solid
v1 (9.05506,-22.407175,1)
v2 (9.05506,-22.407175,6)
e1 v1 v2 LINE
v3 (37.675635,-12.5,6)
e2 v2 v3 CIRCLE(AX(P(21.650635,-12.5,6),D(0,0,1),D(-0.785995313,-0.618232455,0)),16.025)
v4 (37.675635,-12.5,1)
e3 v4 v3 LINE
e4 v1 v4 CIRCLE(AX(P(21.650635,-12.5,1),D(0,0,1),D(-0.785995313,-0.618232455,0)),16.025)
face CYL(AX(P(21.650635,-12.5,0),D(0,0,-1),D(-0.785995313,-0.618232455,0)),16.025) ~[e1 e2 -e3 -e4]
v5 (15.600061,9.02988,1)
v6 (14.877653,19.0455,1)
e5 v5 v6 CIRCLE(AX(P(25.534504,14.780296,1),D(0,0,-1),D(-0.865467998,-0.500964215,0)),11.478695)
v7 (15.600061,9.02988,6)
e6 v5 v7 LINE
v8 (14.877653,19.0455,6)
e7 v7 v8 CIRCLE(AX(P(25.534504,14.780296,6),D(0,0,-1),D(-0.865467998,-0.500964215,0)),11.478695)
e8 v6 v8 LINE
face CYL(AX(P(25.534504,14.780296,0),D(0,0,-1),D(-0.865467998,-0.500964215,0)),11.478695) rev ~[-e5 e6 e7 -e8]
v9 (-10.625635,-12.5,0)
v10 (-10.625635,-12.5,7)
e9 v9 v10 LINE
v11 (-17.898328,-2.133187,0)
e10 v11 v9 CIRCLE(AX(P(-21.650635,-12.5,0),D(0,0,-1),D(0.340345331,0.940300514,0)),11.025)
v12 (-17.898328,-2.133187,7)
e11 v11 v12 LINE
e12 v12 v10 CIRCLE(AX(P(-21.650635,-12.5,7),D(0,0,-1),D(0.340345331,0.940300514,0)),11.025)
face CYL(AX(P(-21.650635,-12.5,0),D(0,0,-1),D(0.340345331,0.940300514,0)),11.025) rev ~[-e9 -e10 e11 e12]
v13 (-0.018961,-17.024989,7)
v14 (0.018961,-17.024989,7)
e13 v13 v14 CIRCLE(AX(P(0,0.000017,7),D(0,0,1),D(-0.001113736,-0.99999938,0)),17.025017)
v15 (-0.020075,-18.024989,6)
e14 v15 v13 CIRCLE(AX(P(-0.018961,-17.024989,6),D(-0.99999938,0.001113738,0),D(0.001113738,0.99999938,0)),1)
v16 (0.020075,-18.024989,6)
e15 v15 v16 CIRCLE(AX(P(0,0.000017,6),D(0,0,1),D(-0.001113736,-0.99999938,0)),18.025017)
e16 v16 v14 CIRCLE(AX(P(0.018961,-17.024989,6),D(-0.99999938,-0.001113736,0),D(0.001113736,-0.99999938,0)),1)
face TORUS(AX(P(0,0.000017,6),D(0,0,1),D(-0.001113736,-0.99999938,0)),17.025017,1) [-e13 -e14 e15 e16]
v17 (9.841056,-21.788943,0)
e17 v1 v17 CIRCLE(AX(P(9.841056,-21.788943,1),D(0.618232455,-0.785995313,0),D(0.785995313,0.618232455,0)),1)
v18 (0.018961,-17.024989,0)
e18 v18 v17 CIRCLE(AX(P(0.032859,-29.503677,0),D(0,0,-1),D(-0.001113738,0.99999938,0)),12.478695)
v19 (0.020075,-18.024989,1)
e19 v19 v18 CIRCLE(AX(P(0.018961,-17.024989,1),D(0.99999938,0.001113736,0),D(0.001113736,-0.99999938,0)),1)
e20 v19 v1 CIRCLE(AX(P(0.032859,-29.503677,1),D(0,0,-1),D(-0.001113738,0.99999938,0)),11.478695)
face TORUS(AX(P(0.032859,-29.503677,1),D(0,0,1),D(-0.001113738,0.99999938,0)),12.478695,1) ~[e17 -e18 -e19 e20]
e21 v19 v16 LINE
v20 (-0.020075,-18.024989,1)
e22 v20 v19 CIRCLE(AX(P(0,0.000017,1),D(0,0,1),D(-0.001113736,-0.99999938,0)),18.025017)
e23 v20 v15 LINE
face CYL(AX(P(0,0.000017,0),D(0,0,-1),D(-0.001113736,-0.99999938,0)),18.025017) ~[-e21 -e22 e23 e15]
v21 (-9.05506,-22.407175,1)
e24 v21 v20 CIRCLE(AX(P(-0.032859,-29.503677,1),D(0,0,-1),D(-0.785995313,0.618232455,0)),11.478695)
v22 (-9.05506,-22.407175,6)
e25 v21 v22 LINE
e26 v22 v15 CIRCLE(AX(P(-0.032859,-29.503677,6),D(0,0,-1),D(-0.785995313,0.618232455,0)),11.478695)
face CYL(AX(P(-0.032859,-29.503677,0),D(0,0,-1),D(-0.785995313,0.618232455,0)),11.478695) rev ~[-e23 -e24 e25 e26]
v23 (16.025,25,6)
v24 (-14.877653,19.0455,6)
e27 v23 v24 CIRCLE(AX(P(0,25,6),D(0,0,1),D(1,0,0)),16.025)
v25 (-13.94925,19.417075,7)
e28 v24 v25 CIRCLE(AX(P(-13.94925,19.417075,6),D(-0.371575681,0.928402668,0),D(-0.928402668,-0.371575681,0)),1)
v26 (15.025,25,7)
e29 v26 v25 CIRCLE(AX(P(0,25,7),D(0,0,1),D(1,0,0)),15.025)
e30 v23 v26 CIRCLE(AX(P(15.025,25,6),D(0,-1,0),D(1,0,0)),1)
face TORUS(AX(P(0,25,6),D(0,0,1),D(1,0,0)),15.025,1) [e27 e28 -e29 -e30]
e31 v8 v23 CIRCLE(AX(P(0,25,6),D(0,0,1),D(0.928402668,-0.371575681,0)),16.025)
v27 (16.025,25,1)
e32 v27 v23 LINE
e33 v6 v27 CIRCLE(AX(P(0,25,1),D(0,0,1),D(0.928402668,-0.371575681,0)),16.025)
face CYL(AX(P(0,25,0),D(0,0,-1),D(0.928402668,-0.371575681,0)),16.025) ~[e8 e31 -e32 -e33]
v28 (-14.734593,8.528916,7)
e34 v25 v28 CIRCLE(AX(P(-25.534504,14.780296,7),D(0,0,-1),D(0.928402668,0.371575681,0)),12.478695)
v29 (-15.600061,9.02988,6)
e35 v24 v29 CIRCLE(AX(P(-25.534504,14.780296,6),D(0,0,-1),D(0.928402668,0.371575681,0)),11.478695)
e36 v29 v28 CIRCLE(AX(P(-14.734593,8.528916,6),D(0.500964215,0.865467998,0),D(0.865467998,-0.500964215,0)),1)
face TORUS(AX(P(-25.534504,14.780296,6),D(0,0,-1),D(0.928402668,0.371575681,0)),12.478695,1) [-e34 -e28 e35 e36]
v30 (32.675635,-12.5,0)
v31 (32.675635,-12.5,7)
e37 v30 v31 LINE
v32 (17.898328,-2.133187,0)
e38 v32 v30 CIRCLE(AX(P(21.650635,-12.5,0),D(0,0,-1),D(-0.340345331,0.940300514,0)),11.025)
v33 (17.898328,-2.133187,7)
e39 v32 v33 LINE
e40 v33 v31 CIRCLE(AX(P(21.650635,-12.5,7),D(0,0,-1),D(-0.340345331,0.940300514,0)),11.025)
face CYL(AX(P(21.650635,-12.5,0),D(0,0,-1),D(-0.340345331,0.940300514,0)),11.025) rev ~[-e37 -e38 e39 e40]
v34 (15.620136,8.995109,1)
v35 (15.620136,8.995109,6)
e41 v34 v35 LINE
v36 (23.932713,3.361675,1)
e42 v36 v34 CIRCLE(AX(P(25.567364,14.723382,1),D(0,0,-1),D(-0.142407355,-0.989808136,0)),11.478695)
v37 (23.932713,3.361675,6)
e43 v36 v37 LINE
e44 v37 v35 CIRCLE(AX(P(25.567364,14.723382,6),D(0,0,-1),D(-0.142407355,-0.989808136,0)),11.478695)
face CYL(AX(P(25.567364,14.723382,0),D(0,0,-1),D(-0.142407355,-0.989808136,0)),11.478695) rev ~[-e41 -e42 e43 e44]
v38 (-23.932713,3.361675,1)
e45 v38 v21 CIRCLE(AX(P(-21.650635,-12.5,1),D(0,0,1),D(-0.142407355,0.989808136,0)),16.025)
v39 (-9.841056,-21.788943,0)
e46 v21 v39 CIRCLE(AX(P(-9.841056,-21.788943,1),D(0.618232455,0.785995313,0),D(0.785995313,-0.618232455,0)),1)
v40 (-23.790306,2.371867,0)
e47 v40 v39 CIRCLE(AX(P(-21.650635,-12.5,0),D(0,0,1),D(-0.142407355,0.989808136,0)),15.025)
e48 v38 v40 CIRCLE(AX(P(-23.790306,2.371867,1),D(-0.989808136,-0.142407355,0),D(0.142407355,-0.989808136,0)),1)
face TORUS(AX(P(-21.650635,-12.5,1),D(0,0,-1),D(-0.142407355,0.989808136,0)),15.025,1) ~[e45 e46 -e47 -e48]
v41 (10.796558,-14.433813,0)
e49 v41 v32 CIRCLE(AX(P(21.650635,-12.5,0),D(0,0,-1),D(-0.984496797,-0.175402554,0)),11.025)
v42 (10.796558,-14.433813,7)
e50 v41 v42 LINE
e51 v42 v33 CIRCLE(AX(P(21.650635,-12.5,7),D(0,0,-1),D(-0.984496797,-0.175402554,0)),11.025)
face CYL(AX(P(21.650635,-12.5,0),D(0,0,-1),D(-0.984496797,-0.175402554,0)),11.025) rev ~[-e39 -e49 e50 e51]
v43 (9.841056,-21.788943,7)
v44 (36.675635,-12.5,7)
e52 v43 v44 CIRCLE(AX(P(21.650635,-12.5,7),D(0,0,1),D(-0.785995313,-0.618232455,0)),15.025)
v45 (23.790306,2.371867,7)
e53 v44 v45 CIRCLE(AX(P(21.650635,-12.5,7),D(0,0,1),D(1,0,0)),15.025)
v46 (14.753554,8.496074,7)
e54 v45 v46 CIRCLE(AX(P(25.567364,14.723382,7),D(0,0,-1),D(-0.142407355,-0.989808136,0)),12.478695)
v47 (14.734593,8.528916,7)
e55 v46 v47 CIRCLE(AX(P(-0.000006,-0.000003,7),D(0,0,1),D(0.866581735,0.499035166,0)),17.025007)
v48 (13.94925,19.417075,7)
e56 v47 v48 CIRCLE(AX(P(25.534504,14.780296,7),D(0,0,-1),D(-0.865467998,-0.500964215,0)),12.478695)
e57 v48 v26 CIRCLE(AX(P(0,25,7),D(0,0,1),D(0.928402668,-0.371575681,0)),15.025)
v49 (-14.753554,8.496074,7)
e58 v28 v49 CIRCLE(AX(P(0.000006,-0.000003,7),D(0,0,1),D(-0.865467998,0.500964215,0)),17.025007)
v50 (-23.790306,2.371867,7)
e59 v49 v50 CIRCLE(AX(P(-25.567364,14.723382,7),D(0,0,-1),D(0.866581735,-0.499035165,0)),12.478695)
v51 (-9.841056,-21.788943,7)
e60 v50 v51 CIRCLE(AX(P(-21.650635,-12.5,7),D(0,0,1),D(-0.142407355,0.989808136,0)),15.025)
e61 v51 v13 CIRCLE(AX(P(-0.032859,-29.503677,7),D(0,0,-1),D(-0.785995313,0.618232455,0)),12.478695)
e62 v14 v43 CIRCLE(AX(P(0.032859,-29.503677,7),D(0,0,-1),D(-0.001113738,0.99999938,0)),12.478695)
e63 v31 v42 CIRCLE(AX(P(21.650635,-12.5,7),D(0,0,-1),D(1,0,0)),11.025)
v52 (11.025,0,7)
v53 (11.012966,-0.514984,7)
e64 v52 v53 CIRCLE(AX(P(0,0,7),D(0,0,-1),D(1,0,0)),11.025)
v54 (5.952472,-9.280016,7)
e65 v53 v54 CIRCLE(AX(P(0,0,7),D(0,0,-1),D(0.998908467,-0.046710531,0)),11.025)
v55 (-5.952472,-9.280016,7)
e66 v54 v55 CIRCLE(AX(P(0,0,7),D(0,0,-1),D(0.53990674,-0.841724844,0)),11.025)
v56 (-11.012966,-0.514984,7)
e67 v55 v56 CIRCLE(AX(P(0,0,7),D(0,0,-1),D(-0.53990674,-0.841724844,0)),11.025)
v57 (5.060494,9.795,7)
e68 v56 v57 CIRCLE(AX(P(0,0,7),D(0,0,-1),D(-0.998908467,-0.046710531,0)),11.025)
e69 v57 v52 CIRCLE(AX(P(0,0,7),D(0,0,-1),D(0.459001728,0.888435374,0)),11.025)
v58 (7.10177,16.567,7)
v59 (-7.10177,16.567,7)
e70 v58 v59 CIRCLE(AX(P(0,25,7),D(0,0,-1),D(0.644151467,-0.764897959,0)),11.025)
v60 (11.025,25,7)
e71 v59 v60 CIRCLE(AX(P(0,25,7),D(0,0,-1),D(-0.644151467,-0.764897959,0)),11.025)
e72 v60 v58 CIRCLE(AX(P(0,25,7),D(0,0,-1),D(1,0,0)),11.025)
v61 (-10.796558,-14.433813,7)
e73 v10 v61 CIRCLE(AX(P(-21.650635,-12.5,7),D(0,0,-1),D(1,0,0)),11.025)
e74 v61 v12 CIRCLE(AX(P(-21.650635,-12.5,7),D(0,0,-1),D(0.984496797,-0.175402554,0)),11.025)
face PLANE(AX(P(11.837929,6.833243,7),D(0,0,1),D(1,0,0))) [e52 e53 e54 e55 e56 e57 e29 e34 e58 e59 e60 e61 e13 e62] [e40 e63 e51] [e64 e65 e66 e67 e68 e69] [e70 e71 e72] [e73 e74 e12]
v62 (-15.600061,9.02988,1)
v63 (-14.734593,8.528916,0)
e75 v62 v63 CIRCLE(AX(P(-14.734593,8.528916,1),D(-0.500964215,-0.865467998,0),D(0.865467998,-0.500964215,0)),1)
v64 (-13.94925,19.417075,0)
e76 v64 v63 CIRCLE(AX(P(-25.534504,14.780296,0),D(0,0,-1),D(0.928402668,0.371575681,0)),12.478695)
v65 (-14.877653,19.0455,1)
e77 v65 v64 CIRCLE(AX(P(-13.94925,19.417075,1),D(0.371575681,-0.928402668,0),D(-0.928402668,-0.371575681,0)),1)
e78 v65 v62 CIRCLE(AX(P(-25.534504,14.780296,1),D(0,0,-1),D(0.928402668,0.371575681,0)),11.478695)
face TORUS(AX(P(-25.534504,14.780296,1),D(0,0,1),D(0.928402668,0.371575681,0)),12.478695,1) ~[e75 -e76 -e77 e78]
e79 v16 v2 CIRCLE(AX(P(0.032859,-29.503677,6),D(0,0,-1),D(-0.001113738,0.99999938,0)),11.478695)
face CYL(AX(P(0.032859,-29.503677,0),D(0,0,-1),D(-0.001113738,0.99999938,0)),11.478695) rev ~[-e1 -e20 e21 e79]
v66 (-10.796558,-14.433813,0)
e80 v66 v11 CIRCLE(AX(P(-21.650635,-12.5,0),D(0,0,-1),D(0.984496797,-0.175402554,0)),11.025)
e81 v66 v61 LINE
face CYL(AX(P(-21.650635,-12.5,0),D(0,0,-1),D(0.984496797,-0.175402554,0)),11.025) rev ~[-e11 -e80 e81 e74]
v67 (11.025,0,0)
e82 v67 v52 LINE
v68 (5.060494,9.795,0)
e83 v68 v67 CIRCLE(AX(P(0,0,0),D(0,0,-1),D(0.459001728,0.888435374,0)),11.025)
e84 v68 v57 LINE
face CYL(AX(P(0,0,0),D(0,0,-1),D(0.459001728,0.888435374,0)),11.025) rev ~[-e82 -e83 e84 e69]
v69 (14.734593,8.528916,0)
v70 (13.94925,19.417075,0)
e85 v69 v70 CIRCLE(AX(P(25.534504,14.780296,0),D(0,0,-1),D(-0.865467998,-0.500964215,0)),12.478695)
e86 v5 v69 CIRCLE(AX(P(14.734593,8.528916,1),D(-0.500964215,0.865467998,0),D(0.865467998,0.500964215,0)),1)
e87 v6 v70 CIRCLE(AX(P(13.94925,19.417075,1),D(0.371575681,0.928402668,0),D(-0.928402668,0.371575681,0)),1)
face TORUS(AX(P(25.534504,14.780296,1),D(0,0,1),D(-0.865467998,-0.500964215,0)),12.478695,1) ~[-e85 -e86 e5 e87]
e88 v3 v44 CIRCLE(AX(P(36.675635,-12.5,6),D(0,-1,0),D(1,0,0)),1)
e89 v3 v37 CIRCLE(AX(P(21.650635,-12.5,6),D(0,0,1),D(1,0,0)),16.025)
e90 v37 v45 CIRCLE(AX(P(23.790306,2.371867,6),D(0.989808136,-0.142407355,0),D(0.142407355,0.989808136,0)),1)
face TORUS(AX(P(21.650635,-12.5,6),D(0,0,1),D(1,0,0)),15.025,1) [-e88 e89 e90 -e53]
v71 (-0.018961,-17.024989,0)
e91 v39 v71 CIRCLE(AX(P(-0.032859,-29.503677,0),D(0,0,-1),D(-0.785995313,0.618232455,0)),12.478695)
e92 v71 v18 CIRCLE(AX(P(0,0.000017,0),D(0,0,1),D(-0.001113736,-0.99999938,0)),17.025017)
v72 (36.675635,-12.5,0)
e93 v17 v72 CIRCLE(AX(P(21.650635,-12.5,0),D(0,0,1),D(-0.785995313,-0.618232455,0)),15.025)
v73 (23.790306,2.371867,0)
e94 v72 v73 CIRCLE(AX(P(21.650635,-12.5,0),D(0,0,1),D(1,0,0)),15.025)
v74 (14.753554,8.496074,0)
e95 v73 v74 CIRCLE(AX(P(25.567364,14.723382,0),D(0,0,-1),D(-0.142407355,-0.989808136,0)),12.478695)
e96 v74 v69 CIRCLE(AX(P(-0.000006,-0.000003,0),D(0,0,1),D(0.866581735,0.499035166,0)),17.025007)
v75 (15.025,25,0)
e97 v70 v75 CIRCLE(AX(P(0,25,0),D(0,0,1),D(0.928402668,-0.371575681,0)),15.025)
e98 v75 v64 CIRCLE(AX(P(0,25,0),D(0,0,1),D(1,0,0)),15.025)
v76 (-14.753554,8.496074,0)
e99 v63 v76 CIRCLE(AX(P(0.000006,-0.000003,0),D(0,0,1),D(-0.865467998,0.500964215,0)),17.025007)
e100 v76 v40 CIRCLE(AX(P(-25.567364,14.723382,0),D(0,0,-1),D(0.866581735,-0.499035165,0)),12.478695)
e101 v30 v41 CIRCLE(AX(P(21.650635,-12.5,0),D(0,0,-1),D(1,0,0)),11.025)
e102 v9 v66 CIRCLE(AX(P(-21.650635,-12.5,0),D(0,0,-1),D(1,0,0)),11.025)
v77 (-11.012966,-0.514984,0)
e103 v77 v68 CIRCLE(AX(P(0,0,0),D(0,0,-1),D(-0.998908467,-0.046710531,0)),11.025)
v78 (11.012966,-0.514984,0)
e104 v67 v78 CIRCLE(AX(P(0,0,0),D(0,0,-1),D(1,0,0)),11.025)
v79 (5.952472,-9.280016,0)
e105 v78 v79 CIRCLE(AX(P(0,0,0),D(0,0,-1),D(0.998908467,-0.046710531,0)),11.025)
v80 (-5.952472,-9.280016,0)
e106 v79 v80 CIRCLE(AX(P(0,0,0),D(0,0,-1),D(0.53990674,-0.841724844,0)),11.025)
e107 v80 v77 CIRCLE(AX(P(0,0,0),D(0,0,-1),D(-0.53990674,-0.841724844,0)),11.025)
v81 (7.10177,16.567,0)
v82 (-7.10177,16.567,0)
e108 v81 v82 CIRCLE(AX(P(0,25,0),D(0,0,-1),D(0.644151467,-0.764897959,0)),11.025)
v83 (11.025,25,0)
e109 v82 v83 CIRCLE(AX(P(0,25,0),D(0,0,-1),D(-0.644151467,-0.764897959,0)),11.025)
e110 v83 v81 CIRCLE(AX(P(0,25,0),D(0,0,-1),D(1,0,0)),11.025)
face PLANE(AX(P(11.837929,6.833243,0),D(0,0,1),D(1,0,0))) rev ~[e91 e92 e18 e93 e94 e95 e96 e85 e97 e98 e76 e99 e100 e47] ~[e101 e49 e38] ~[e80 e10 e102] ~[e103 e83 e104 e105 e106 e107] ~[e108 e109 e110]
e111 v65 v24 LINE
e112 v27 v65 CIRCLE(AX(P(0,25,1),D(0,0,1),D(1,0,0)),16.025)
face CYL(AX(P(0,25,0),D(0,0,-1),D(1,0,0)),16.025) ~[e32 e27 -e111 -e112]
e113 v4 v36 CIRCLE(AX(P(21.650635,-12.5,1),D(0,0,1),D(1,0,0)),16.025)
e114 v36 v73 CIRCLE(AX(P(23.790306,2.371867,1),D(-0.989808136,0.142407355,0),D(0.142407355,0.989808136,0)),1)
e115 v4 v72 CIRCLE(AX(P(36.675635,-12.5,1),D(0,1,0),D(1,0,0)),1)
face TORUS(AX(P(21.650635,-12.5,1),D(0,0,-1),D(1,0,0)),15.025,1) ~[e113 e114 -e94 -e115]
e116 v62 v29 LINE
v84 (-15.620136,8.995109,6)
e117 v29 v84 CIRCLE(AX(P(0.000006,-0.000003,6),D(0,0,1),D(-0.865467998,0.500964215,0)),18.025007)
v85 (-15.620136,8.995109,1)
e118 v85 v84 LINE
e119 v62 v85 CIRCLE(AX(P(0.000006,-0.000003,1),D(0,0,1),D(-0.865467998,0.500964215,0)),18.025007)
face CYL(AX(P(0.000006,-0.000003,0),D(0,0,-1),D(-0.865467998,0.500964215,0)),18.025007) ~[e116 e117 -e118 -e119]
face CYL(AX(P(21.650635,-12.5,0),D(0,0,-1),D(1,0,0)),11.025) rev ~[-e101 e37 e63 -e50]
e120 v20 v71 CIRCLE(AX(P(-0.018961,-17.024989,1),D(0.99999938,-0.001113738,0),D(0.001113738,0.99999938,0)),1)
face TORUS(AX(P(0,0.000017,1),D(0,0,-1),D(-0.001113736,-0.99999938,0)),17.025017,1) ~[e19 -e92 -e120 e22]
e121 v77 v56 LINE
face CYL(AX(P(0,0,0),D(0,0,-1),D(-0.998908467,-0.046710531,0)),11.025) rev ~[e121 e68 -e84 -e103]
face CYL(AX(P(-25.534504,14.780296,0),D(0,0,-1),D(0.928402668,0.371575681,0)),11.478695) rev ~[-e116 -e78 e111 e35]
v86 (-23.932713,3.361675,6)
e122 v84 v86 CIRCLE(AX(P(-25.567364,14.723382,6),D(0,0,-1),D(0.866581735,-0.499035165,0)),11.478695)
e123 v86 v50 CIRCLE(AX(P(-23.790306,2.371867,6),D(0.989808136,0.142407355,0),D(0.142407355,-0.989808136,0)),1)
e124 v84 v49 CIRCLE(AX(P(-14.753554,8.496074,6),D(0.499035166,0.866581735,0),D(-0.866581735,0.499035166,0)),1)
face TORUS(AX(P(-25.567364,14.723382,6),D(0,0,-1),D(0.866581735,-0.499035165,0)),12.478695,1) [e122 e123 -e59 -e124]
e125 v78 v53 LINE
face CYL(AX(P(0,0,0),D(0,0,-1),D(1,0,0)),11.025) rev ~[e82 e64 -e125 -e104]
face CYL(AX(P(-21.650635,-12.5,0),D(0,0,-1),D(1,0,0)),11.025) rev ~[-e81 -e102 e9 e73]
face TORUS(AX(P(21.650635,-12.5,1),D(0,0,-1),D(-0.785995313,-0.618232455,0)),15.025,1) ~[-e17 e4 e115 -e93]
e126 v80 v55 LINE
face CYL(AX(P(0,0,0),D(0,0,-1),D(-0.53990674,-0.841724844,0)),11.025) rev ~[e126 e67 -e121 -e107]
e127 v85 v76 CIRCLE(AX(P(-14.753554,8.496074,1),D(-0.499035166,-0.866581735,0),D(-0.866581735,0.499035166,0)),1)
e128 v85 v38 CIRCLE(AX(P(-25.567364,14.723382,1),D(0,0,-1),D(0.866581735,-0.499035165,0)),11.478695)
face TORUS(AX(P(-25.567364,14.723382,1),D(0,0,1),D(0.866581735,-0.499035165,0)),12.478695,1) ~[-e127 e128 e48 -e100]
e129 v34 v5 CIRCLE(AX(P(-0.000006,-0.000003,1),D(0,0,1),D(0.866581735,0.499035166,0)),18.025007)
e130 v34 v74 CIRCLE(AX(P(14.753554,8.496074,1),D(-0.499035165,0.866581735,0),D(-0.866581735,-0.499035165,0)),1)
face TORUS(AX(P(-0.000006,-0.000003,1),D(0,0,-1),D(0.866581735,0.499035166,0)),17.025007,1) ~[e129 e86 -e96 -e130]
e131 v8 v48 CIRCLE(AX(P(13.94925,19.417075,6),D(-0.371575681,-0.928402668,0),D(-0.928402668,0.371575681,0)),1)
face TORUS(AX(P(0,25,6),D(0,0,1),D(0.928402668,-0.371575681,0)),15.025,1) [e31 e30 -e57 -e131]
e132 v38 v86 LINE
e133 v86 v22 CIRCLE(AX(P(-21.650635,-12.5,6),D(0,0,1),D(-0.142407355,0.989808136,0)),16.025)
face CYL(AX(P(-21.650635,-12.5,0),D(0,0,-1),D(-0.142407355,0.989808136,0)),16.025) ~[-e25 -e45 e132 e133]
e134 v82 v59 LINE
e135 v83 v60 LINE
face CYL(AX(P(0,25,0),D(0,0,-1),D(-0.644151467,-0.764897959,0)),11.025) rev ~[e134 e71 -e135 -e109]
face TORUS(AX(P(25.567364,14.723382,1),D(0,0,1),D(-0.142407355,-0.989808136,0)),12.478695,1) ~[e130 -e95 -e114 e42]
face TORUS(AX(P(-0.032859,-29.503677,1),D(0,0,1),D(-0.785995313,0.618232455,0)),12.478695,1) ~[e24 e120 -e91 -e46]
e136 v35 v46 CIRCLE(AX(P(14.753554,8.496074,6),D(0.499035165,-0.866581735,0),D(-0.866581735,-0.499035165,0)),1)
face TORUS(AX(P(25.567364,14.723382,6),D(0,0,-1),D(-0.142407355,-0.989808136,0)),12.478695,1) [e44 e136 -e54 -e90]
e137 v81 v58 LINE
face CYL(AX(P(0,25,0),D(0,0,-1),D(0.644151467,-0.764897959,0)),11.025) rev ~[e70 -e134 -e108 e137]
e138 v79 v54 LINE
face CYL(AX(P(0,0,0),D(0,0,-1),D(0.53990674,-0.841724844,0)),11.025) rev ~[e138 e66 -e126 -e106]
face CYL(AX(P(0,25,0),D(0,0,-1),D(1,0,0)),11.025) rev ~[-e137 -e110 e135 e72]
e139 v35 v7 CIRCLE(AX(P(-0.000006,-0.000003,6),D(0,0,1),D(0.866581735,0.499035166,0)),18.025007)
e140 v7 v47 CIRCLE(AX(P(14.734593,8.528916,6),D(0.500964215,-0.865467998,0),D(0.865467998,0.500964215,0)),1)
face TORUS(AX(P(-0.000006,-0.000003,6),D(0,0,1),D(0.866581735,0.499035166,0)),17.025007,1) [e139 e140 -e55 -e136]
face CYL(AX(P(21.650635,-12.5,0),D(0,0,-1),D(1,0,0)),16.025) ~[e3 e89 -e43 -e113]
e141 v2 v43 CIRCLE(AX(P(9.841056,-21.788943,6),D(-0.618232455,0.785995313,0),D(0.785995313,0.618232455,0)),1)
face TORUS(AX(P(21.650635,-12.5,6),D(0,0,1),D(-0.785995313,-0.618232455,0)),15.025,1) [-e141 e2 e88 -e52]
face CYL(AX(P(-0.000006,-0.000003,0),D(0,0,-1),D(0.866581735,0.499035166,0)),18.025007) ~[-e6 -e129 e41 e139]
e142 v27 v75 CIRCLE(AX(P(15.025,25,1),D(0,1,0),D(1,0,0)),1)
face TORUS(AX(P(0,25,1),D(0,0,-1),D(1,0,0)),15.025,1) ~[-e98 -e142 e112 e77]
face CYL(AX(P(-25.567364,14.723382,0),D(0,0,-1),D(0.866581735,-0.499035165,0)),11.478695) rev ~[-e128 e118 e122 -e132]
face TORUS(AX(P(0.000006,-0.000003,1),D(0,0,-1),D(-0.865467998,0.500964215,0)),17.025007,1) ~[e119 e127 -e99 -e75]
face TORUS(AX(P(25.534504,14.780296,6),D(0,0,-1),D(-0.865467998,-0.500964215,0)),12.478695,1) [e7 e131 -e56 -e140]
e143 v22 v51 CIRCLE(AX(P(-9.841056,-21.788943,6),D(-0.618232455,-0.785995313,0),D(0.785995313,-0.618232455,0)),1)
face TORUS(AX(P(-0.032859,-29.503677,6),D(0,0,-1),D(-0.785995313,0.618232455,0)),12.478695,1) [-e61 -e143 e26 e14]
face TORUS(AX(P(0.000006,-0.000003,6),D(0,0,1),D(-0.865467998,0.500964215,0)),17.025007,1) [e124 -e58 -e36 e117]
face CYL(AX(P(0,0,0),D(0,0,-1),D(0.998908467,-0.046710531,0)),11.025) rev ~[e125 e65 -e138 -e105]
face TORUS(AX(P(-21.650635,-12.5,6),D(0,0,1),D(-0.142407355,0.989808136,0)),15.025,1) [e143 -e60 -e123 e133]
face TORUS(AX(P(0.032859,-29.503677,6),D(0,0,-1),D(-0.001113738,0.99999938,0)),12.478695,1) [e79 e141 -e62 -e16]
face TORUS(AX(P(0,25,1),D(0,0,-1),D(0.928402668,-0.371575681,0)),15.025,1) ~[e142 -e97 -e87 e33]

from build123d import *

# Parameters (mm, degrees)
F1_DEPTH = 7
F2_R     = 1


with BuildPart() as f1:
    # F0 (on Top) → F1 (new body)
    with BuildSketch(Plane.XY):
        with BuildLine():
            ThreePointArc((5.060494047, 9.795), (9.4165432051, 5.7340508426), (11.025, 0))
            ThreePointArc((11.025, 0), (11.0219910528, -0.2575620937), (11.0129658536, -0.5149835996))
            ThreePointArc((11.0129658536, -0.5149835996), (14.1740719643, 1.673977168), (17.7656075732, 3.0469349442))
            ThreePointArc((17.7656075732, 3.0469349442), (16.9557411525, 6.115837389), (15.6201357815, 8.9951088469))
            ThreePointArc((15.6201357815, 8.9951088469), (15.6101079032, 9.0125), (15.600060662, 9.0298799738))
            ThreePointArc((15.600060662, 9.0298799738), (13.7743411206, 11.6261838836), (11.5215268519, 13.862))
            ThreePointArc((11.5215268519, 13.862), (8.536742735, 11.4381178122), (5.060494047, 9.795))
        make_face()
        with BuildLine():
            ThreePointArc((-11.0129658536, -0.5149835996), (-9.5479300767, 5.5125), (-5.060494047, 9.795))
            ThreePointArc((-5.060494047, 9.795), (-8.536742735, 11.4381178122), (-11.5215268519, 13.862))
            ThreePointArc((-11.5215268519, 13.862), (-13.7743411206, 11.6261838836), (-15.600060662, 9.0298799738))
            ThreePointArc((-15.600060662, 9.0298799738), (-15.6101079032, 9.0125), (-15.6201357815, 8.9951088469))
            ThreePointArc((-15.6201357815, 8.9951088469), (-16.9557411525, 6.115837389), (-17.7656075732, 3.0469349442))
            ThreePointArc((-17.7656075732, 3.0469349442), (-14.1740719643, 1.673977168), (-11.0129658536, -0.5149835996))
        make_face()
        with BuildLine():
            ThreePointArc((7.1017699202, 16.567), (9.4093598037, 15.3741527599), (11.5215268519, 13.862))
            ThreePointArc((11.5215268519, 13.862), (13.4516295767, 16.2905633516), (14.8776527516, 19.0454997185))
            ThreePointArc((14.8776527516, 19.0454997185), (15.7355490903, 21.9679841973), (16.025, 25))
            ThreePointArc((16.025, 25), (-3.0320158027, 40.7355490903), (-14.8776527516, 19.0454997185))
            ThreePointArc((-14.8776527516, 19.0454997185), (-13.4516295767, 16.2905633516), (-11.5215268519, 13.862))
            ThreePointArc((-11.5215268519, 13.862), (-9.4093598037, 15.3741527599), (-7.1017699202, 16.567))
            ThreePointArc((-7.1017699202, 16.567), (-4.6504629678, 34.9961902335), (11.025, 25))
            ThreePointArc((11.025, 25), (9.9961902335, 20.3495370322), (7.1017699202, 16.567))
        make_face()
        with BuildLine():
            ThreePointArc((14.8776527516, 19.0454997185), (13.4516295767, 16.2905633516), (11.5215268519, 13.862))
            ThreePointArc((11.5215268519, 13.862), (13.7743411206, 11.6261838836), (15.600060662, 9.0298799738))
            ThreePointArc((15.600060662, 9.0298799738), (14.0855515443, 13.9545041029), (14.8776527516, 19.0454997185))
        make_face()
        with BuildLine():
            ThreePointArc((6.2440807213, -16.9089349442), (5.6373292293, -13.1120949802), (5.9524718066, -9.2800164004))
            ThreePointArc((5.9524718066, -9.2800164004), (0, -11.025), (-5.9524718066, -9.2800164004))
            ThreePointArc((-5.9524718066, -9.2800164004), (-5.7075536533, -10.8817357588), (-5.6256350946, -12.5))
            ThreePointArc((-5.6256350946, -12.5), (-5.7809996414, -14.726049322), (-6.2440807213, -16.9089349442))
            ThreePointArc((-6.2440807213, -16.9089349442), (-3.1814000319, -17.7420212726), (-0.0200751195, -18.0249888208))
            ThreePointArc((-0.0200751195, -18.0249888208), (0, -18.025), (0.0200751195, -18.0249888208))
            ThreePointArc((0.0200751195, -18.0249888208), (3.1814000319, -17.7420212726), (6.2440807213, -16.9089349442))
        make_face()
        with BuildLine():
            ThreePointArc((23.9327129598, 3.3616753723), (20.8338564928, 3.5041712599), (17.7656075732, 3.0469349442))
            ThreePointArc((17.7656075732, 3.0469349442), (17.9600348205, 1.5289781706), (18.025, 0))
            ThreePointArc((18.025, 0), (17.9933040884, -1.0684722648), (17.8983278246, -2.1331868372))
            ThreePointArc((17.8983278246, -2.1331868372), (27.982358294, -3.4744858138), (32.6756350946, -12.5))
            ThreePointArc((32.6756350946, -12.5), (22.6213111419, -23.4821861672), (10.7965579044, -14.4338131628))
            ThreePointArc((10.7965579044, -14.4338131628), (8.6097269498, -15.8358210033), (6.2440807213, -16.9089349442))
            ThreePointArc((6.2440807213, -16.9089349442), (7.3822269161, -19.7947346115), (9.0550602082, -22.4071750908))
            ThreePointArc((9.0550602082, -22.4071750908), (26.89260693, -27.643393156), (37.6756350946, -12.5))
            ThreePointArc((37.6756350946, -12.5), (33.7620124479, -2.0064227451), (23.9327129598, 3.3616753723))
        make_face()
        with BuildLine():
            ThreePointArc((15.6201357815, 8.9951088469), (16.9557411525, 6.115837389), (17.7656075732, 3.0469349442))
            ThreePointArc((17.7656075732, 3.0469349442), (20.8338564928, 3.5041712599), (23.9327129598, 3.3616753723))
            ThreePointArc((23.9327129598, 3.3616753723), (19.1277308225, 5.2211934122), (15.6201357815, 8.9951088469))
        make_face()
        with BuildLine():
            ThreePointArc((-15.600060662, 9.0298799738), (-13.7743411206, 11.6261838836), (-11.5215268519, 13.862))
            ThreePointArc((-11.5215268519, 13.862), (-13.4516295767, 16.2905633516), (-14.8776527516, 19.0454997185))
            ThreePointArc((-14.8776527516, 19.0454997185), (-14.0855515443, 13.9545041029), (-15.600060662, 9.0298799738))
        make_face()
        with BuildLine():
            ThreePointArc((9.0550602082, -22.4071750908), (7.3822269161, -19.7947346115), (6.2440807213, -16.9089349442))
            ThreePointArc((6.2440807213, -16.9089349442), (3.1814000319, -17.7420212726), (0.0200751195, -18.0249888208))
            ThreePointArc((0.0200751195, -18.0249888208), (5.0421792782, -19.1756975152), (9.0550602082, -22.4071750908))
        make_face()
        with BuildLine():
            ThreePointArc((-23.9327129598, 3.3616753723), (-20.8338564928, 3.5041712599), (-17.7656075732, 3.0469349442))
            ThreePointArc((-17.7656075732, 3.0469349442), (-16.9557411525, 6.115837389), (-15.6201357815, 8.9951088469))
            ThreePointArc((-15.6201357815, 8.9951088469), (-19.1277308225, 5.2211934122), (-23.9327129598, 3.3616753723))
        make_face()
        with BuildLine():
            ThreePointArc((-17.8983278246, -2.1331868372), (-18.0190867536, 0.4616682434), (-17.7656075732, 3.0469349442))
            ThreePointArc((-17.7656075732, 3.0469349442), (-20.8338564928, 3.5041712599), (-23.9327129598, 3.3616753723))
            ThreePointArc((-23.9327129598, 3.3616753723), (-35.5286921903, -20.5125), (-9.0550602082, -22.4071750908))
            ThreePointArc((-9.0550602082, -22.4071750908), (-7.3822269161, -19.7947346115), (-6.2440807213, -16.9089349442))
            ThreePointArc((-6.2440807213, -16.9089349442), (-8.6097269498, -15.8358210033), (-10.7965579044, -14.4338131628))
            ThreePointArc((-10.7965579044, -14.4338131628), (-31.1985651713, -18.0125), (-17.8983278246, -2.1331868372))
        make_face()
        with BuildLine():
            ThreePointArc((-0.0200751195, -18.0249888208), (-3.1814000319, -17.7420212726), (-6.2440807213, -16.9089349442))
            ThreePointArc((-6.2440807213, -16.9089349442), (-7.3822269161, -19.7947346115), (-9.0550602082, -22.4071750908))
            ThreePointArc((-9.0550602082, -22.4071750908), (-5.0421792782, -19.1756975152), (-0.0200751195, -18.0249888208))
        make_face()
        with BuildLine():
            ThreePointArc((-5.060494047, 9.795), (0, 11.025), (5.060494047, 9.795))
            ThreePointArc((5.060494047, 9.795), (8.536742735, 11.4381178122), (11.5215268519, 13.862))
            ThreePointArc((11.5215268519, 13.862), (9.4093598037, 15.3741527599), (7.1017699202, 16.567))
            ThreePointArc((7.1017699202, 16.567), (0, 13.975), (-7.1017699202, 16.567))
            ThreePointArc((-7.1017699202, 16.567), (-9.4093598037, 15.3741527599), (-11.5215268519, 13.862))
            ThreePointArc((-11.5215268519, 13.862), (-8.536742735, 11.4381178122), (-5.060494047, 9.795))
        make_face()
        with BuildLine():
            ThreePointArc((-5.9524718066, -9.2800164004), (-9.5479300767, -5.5125), (-11.0129658536, -0.5149835996))
            ThreePointArc((-11.0129658536, -0.5149835996), (-14.1740719643, 1.673977168), (-17.7656075732, 3.0469349442))
            ThreePointArc((-17.7656075732, 3.0469349442), (-18.0190867536, 0.4616682434), (-17.8983278246, -2.1331868372))
            ThreePointArc((-17.8983278246, -2.1331868372), (-12.6251209084, -6.1682768006), (-10.6256350946, -12.5))
            ThreePointArc((-10.6256350946, -12.5), (-10.6684489274, -13.4706760473), (-10.7965579044, -14.4338131628))
            ThreePointArc((-10.7965579044, -14.4338131628), (-8.6097269498, -15.8358210033), (-6.2440807213, -16.9089349442))
            ThreePointArc((-6.2440807213, -16.9089349442), (-5.7809996414, -14.726049322), (-5.6256350946, -12.5))
            ThreePointArc((-5.6256350946, -12.5), (-5.7075536533, -10.8817357588), (-5.9524718066, -9.2800164004))
        make_face()
        with BuildLine():
            ThreePointArc((17.7656075732, 3.0469349442), (14.1740719643, 1.673977168), (11.0129658536, -0.5149835996))
            ThreePointArc((11.0129658536, -0.5149835996), (9.5479300767, -5.5125), (5.9524718066, -9.2800164004))
            ThreePointArc((5.9524718066, -9.2800164004), (5.6373292293, -13.1120949802), (6.2440807213, -16.9089349442))
            ThreePointArc((6.2440807213, -16.9089349442), (8.6097269498, -15.8358210033), (10.7965579044, -14.4338131628))
            ThreePointArc((10.7965579044, -14.4338131628), (12.1027050179, -6.9875), (17.8983278246, -2.1331868372))
            ThreePointArc((17.8983278246, -2.1331868372), (17.9933040884, -1.0684722648), (18.025, 0))
            ThreePointArc((18.025, 0), (17.9600348205, 1.5289781706), (17.7656075732, 3.0469349442))
        make_face()
    extrude(amount=F1_DEPTH)

    # F2
    f2_edges = [f1.edges().sort_by_distance(p)[0] for p in [
        (14.877653, 19.0455, 3.5),
        (-14.877653, 19.0455, 3.5),
        (0, 41.025, 0),
        (0, 41.025, 7),
        (-15.600061, 9.02988, 3.5),
        (-14.085552, 13.954504, 0),
        (-14.085552, 13.954504, 7),
        (-15.620136, 8.995109, 3.5),
        (-23.932713, 3.361675, 3.5),
        (-19.127731, 5.221193, 0),
        (-19.127731, 5.221193, 7),
        (-9.05506, -22.407175, 3.5),
        (-35.528692, -20.5125, 0),
        (-35.528692, -20.5125, 7),
        (0.020075, -18.024989, 3.5),
        (9.05506, -22.407175, 3.5),
        (5.042179, -19.175698, 0),
        (5.042179, -19.175698, 7),
    ]]
    fillet(f2_edges, radius=F2_R)


solid = f1.part
